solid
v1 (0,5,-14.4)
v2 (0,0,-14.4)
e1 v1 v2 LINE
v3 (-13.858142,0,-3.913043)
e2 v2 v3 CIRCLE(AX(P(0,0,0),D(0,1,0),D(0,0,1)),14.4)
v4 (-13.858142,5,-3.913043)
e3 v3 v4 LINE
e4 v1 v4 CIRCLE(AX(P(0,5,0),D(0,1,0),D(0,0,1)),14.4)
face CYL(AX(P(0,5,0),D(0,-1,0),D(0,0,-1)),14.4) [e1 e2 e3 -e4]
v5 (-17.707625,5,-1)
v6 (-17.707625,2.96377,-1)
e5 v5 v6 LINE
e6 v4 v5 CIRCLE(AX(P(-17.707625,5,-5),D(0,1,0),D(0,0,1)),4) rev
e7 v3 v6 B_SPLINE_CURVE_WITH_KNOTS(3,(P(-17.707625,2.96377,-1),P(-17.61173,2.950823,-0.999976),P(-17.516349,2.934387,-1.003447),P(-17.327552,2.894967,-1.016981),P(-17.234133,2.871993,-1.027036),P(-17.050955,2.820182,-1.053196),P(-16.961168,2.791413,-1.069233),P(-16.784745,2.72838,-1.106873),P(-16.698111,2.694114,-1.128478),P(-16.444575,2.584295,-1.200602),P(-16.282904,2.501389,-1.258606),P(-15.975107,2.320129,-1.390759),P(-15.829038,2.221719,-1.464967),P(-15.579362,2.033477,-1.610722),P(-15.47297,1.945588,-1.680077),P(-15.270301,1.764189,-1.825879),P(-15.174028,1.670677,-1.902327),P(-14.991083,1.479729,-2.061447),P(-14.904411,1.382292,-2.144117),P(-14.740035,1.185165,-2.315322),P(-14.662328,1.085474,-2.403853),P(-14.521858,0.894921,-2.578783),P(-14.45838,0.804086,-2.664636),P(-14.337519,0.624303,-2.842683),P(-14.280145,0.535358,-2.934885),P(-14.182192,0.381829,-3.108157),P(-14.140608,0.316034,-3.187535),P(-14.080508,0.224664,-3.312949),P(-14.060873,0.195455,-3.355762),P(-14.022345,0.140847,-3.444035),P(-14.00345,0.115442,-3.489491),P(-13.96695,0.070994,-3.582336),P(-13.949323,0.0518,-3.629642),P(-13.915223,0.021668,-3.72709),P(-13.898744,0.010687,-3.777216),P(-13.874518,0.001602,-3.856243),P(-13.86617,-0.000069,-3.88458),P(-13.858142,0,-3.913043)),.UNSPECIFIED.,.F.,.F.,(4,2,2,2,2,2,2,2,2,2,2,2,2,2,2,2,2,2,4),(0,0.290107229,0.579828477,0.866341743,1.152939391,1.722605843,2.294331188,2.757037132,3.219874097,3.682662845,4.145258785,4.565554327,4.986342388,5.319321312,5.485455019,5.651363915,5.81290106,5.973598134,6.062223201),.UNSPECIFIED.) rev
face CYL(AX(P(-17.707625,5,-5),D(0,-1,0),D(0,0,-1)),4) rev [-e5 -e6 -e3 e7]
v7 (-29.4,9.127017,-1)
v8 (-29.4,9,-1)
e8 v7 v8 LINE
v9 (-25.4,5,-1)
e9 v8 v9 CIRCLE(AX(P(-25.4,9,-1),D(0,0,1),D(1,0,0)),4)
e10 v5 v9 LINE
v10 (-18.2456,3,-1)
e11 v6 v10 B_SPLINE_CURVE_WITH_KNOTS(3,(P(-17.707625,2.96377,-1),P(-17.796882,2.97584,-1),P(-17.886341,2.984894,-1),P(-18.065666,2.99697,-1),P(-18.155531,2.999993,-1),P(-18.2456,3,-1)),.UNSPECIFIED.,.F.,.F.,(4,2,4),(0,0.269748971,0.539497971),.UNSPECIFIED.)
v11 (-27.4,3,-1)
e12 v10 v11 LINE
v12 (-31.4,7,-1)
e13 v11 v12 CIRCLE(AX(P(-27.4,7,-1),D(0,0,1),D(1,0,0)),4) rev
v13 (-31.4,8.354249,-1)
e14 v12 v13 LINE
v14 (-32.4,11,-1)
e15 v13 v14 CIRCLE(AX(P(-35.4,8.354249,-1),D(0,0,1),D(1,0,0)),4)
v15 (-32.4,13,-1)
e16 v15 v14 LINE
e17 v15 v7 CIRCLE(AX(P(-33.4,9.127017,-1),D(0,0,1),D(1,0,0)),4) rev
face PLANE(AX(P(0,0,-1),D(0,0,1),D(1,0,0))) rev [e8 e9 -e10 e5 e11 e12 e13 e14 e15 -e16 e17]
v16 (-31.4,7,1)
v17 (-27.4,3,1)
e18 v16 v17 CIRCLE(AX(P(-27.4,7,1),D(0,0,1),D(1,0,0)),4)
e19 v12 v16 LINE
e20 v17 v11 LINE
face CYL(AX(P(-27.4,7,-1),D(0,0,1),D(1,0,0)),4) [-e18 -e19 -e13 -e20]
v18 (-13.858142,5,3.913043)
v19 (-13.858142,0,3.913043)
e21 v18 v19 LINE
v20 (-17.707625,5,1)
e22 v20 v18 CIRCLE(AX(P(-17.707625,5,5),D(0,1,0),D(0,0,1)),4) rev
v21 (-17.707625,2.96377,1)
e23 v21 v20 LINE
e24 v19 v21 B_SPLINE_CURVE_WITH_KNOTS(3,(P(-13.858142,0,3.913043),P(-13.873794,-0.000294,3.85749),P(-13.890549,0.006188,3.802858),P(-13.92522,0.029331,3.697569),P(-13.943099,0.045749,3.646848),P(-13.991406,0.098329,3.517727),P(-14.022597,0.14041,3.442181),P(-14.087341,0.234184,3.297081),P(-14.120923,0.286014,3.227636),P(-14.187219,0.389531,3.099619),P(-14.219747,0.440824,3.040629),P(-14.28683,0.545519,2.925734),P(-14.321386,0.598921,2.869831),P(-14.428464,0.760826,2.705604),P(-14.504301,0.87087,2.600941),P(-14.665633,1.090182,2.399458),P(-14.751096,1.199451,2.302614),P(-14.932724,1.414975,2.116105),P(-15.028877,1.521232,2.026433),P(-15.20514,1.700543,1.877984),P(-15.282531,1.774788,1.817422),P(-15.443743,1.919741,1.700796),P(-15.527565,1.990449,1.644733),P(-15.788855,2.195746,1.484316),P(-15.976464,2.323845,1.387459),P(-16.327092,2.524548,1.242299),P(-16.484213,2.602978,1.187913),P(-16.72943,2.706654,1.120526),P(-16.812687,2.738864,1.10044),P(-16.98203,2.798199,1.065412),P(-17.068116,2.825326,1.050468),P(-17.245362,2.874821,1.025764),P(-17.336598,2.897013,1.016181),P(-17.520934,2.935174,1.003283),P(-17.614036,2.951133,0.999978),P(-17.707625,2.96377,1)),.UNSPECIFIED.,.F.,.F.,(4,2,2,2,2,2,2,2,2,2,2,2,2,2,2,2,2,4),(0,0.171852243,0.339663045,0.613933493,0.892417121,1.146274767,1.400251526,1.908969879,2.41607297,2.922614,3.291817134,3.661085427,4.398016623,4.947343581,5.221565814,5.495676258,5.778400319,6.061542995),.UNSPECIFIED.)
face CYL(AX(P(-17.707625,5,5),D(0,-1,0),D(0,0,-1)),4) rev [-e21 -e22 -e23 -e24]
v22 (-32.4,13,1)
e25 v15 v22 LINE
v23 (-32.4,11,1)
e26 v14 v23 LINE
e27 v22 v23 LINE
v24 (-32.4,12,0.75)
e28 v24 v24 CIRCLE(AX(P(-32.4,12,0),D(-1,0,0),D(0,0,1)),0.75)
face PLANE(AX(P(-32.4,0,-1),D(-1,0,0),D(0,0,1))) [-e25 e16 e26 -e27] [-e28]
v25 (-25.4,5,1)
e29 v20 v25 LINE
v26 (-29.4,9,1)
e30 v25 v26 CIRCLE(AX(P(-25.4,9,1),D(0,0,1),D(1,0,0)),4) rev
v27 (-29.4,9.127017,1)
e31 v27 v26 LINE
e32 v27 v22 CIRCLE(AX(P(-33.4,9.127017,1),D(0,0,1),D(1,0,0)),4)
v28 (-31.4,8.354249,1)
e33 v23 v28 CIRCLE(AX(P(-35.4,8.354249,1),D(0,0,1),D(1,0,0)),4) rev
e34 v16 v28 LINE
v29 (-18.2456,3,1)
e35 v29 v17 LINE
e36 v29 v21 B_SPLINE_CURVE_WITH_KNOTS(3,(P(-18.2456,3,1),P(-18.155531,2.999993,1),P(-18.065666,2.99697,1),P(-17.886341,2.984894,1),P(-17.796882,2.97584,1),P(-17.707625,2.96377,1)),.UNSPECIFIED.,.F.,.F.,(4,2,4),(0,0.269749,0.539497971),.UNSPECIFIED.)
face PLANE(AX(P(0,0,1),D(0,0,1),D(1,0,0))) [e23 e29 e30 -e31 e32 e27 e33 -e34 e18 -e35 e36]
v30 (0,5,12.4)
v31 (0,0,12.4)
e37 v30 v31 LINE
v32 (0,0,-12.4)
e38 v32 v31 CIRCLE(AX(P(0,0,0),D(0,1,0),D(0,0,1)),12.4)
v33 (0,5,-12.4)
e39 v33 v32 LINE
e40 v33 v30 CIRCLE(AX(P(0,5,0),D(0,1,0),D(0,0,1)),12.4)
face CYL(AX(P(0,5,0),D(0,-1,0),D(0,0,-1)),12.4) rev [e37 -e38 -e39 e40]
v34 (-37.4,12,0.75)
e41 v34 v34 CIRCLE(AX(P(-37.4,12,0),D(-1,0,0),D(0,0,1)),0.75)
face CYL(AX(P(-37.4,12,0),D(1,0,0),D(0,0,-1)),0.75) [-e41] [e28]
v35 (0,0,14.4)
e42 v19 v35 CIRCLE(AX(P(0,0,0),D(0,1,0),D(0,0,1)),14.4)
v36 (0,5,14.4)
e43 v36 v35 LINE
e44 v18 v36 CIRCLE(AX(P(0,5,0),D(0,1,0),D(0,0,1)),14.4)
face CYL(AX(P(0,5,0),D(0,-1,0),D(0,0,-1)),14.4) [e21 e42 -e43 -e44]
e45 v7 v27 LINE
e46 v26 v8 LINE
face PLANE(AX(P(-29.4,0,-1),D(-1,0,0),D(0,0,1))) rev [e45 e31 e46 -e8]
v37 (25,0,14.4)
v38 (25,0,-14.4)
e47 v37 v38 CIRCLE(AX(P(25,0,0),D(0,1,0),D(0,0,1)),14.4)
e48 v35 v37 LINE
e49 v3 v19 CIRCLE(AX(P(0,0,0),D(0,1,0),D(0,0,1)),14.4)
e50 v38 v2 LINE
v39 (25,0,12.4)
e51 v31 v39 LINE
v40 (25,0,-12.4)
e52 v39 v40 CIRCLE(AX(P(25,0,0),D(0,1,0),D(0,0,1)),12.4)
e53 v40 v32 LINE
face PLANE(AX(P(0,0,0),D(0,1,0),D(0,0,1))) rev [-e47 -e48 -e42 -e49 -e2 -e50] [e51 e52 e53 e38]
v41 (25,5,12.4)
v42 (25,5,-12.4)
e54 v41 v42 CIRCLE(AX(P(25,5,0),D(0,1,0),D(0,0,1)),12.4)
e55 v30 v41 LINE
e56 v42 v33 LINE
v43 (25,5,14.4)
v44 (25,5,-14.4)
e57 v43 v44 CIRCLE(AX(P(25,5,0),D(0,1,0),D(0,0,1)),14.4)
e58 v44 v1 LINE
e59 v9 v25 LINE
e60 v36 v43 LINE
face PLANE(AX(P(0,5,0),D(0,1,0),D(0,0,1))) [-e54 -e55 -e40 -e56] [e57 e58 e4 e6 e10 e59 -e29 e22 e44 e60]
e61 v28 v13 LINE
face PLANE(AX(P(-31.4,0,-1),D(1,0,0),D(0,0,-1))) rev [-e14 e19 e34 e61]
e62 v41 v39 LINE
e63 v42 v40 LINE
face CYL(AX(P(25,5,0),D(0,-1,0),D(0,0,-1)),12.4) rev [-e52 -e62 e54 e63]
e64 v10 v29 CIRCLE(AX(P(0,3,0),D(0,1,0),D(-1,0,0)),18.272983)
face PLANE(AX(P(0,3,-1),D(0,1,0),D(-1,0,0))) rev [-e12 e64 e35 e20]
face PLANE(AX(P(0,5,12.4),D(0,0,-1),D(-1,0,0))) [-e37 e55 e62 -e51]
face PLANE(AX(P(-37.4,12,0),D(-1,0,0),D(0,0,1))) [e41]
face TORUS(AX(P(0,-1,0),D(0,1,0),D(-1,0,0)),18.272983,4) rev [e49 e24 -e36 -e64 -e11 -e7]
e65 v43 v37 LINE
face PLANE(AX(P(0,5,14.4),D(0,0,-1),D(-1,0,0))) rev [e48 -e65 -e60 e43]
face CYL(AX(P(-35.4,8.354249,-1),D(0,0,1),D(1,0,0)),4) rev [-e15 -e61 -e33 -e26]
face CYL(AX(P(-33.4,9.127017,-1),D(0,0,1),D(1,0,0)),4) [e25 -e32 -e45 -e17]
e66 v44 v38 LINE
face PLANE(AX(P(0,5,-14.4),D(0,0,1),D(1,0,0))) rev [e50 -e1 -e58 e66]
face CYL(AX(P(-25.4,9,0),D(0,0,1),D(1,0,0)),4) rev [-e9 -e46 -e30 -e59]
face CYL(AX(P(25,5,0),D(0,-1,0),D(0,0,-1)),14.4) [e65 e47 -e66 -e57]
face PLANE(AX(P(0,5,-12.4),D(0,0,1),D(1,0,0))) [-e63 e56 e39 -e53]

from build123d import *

# Parameters (mm, degrees)
BOSS_EXTRUDE1_DEPTH      = 5
BOSS_EXTRUDE2_DEPTH      = 1
BOSS_EXTRUDE2_DEPTH_BACK = 1
SKETCH4_W                = 2
SKETCH4_H                = 1
SKETCH4_W_2              = 17
SKETCH4_H_2              = 2
SKETCH5_R                = 0.75
BOSS_EXTRUDE3_DEPTH      = 5
FILLET1_R                = 4


with BuildPart() as part:
    # Sketch1 → Boss-Extrude1 (new body)
    with BuildSketch(Plane(origin=(0, 0, 0), x_dir=(1, 0, 0), z_dir=(0, 1, 0))):
        with BuildLine():
            Line((0, 14.4), (25, 14.4))
            ThreePointArc((25, 14.4), (39.4, 0), (25, -14.4))
            Line((25, -14.4), (0, -14.4))
            ThreePointArc((0, -14.4), (-14.4, 0), (0, 14.4))
        make_face()
        with BuildLine():
            Line((0, 12.4), (25, 12.4))
            ThreePointArc((25, 12.4), (37.4, 0), (25, -12.4))
            Line((25, -12.4), (0, -12.4))
            ThreePointArc((0, -12.4), (-12.4, 0), (0, 12.4))
        make_face(mode=Mode.SUBTRACT)
    extrude(amount=BOSS_EXTRUDE1_DEPTH)

    # Sketch4 → Boss-Extrude2 (add, two sides: drawn at the far end of the back side and taken through both)
    with BuildSketch(Plane.XY.offset(-BOSS_EXTRUDE2_DEPTH_BACK)):
        Polygon((-31.4, 12), (-29.4, 12), (-29.4, 13), (-32.4, 13), (-32.4, 11), (-31.4, 11), align=None)
        with Locations((-30.4, 11.5)):
            Rectangle(SKETCH4_W, SKETCH4_H)
        Polygon((-29.4, 3), (-29.4, 5), (-29.4, 11), (-31.4, 11), (-31.4, 3), align=None)
        with Locations((-20.9, 4)):
            Rectangle(SKETCH4_W_2, SKETCH4_H_2)
    extrude(amount=BOSS_EXTRUDE2_DEPTH + BOSS_EXTRUDE2_DEPTH_BACK)

    # Sketch5 → Boss-Extrude3 (add)
    with BuildSketch(Plane.ZY.offset(32.4)):
        with Locations((0, 12)):
            Circle(SKETCH5_R)
    extrude(amount=BOSS_EXTRUDE3_DEPTH)

    # Fillet1
    # the kernel refuses this fillet: 4 mm, written as the material it adds along each edge
    with BuildSketch(Plane(origin=(-14.365235814, 5, -1), x_dir=(0.17149804582148126, 0, -0.9851844600273663), z_dir=(0, -1, 0))) as fillet1_piece_1:
        with BuildLine():
            CenterArc((3.367524545, -3.978862537), FILLET1_R, 95.892851455, 74.232218513)
            Line((-0.573213295, -3.292870354), (-0.652028052, -3.27915051))
            Line((-0.652028052, -3.27915051), (-0.078814757, 0.013719844))
            Line((-0.078814757, 0.013719844), (0.008213474, 0.079577251))
            ThreePointArc((0.008213474, 0.079577251), (1.47842541, 0.003905135), (2.948637345, 0.079577251))
            Line((2.948637345, 0.079577251), (2.95685082, 0))
        make_face()
    extrude(amount=2)
    with BuildSketch(Plane(origin=(-14.365235814, 5, 1), x_dir=(0.17149804582148112, 0, 0.9851844600273663), z_dir=(0, -1, 0))) as fillet1_piece_2:
        with BuildLine():
            CenterArc((3.367524545, 3.978862537), FILLET1_R, 189.874930032, 74.232218513)
            Line((-0.573213295, 3.292870354), (-0.652028052, 3.27915051))
            Line((-0.652028052, 3.27915051), (-0.078814757, -0.013719844))
            Line((-0.078814757, -0.013719844), (0.008213474, -0.079577251))
            ThreePointArc((0.008213474, -0.079577251), (1.47842541, -0.003905135), (2.948637345, -0.079577251))
            Line((2.948637345, -0.079577251), (2.95685082, 0))
        make_face()
    extrude(amount=2)
    with BuildSketch(Plane(origin=(0, 3, 0), x_dir=(-0.7371891614816782, 0, 0.6756864214959037), z_dir=(0.6756864214959037, 0, 0.7371891614816782))) as fillet1_piece_3_section:
        with BuildLine():
            CenterArc((18.272983346, 4), FILLET1_R, 194.477512186, 75.522487814)
            Line((18.272983346, 0), (18.272983346, -0.08))
            Line((18.272983346, -0.08), (14.4, -0.08))
            Line((14.4, -0.08), (14.32, 0))
            ThreePointArc((14.32, 0), (14.32, 1.5), (14.322540333, 2.98))
            Line((14.322540333, 2.98), (14.4, 3))
        make_face()
    fillet1_piece_3 = revolve(axis=Axis((0, 3, 0), (0, -1, 0)), revolution_arc=85.014954966, mode=Mode.PRIVATE)
    fillet1_piece_3 = split(fillet1_piece_3, bisect_by=Plane(origin=(-15.301586286, 2.241601932, -1), z_dir=(0, 0, 1)), keep=Keep.TOP, mode=Mode.PRIVATE)
    fillet1_piece_3 = split(fillet1_piece_3, bisect_by=Plane(origin=(-15.301586286, 2.241601932, 1), z_dir=(0, 0, -1)), keep=Keep.TOP, mode=Mode.PRIVATE)
    add(fillet1_piece_3)
    with BuildSketch(Plane(origin=(-29.4, 5, 1), x_dir=(1, 0, 0), z_dir=(0, 0, -1))) as fillet1_piece_4:
        with BuildLine():
            CenterArc((FILLET1_R, -FILLET1_R), FILLET1_R, 90, 90)
            Line((0, -FILLET1_R), (-FILLET1_R * 0.02, -FILLET1_R))
            Line((-FILLET1_R * 0.02, -FILLET1_R), (-FILLET1_R * 0.02, FILLET1_R * 0.02))
            Line((-FILLET1_R * 0.02, FILLET1_R * 0.02), (FILLET1_R, FILLET1_R * 0.02))
            Line((FILLET1_R, FILLET1_R * 0.02), (FILLET1_R, 0))
        make_face()
    extrude(amount=2)
    with BuildSketch(Plane(origin=(-31.4, 11, -1), x_dir=(0, -1, 0), z_dir=(0, 0, 1))) as fillet1_piece_5:
        with BuildLine():
            CenterArc((2.645751311, -4), FILLET1_R, 90, 41.409622109)
            Line((0, -1), (-0.052915026, -0.94))
            ThreePointArc((-0.052915026, -0.94), (-0.08, -0.5), (-0.08, 0))
            Line((-0.08, 0), (0, 0.08))
            Line((0, 0.08), (2.645751311, 0.08))
            Line((2.645751311, 0.08), (2.645751311, 0))
        make_face()
    extrude(amount=2)
    with BuildSketch(Plane(origin=(-14.365235814, 5, -1), x_dir=(0.17149804582148126, 0, -0.9851844600273663), z_dir=(0, -1, 0))) as fillet1_piece_6a_section:
        with BuildLine():
            CenterArc((3.367524545, -3.978862537), FILLET1_R, 95.892851455, 74.232218513)
            Line((-0.573213295, -3.292870354), (-0.652028052, -3.27915051))
            Line((-0.652028052, -3.27915051), (-0.078814757, 0.013719844))
            Line((-0.078814757, 0.013719844), (0.008213474, 0.079577251))
            ThreePointArc((0.008213474, 0.079577251), (1.47842541, 0.003905135), (2.948637345, 0.079577251))
            Line((2.948637345, 0.079577251), (2.95685082, 0))
        make_face()
    fillet1_piece_6a = extrude(amount=10.355974154, mode=Mode.PRIVATE)
    fillet1_piece_6a = split(fillet1_piece_6a, bisect_by=Plane(origin=(-15.057221624, 0, -1.646357347), z_dir=(0, 1, 0)), keep=Keep.TOP, mode=Mode.PRIVATE)
    fillet1_piece_6a = split(fillet1_piece_6a, bisect_by=Plane(origin=(-15.057221624, 3, -1.646357347), z_dir=(0, -1, 0)), keep=Keep.TOP, mode=Mode.PRIVATE)
    with BuildSketch(Plane(origin=(0, 3, 0), x_dir=(-0.7371891614816782, 0, 0.6756864214959037), z_dir=(0.6756864214959037, 0, 0.7371891614816782))) as fillet1_piece_6b_section:
        with BuildLine():
            CenterArc((18.272983346, 4), FILLET1_R, 194.477512186, 75.522487814)
            Line((18.272983346, 0), (18.272983346, -0.08))
            Line((18.272983346, -0.08), (14.4, -0.08))
            Line((14.4, -0.08), (14.32, 0))
            ThreePointArc((14.32, 0), (14.32, 1.5), (14.322540333, 2.98))
            Line((14.322540333, 2.98), (14.4, 3))
        make_face()
    fillet1_piece_6b = revolve(axis=Axis((0, 3, 0), (0, -1, 0)), revolution_arc=85.014954966, mode=Mode.PRIVATE)
    fillet1_piece_6b = split(fillet1_piece_6b, bisect_by=Plane(origin=(-13.861423807, 2.266551545, -1), z_dir=(0, 0, -1)), keep=Keep.TOP, mode=Mode.PRIVATE)
    fillet1_piece_6 = fillet1_piece_6a & fillet1_piece_6b
    add(fillet1_piece_6)
    with BuildSketch(Plane(origin=(0, 3, 0), x_dir=(-0.7371891614816782, 0, 0.6756864214959037), z_dir=(0.6756864214959037, 0, 0.7371891614816782))) as fillet1_piece_7a_section:
        with BuildLine():
            CenterArc((18.272983346, 4), FILLET1_R, 194.477512186, 75.522487814)
            Line((18.272983346, 0), (18.272983346, -0.08))
            Line((18.272983346, -0.08), (14.4, -0.08))
            Line((14.4, -0.08), (14.32, 0))
            ThreePointArc((14.32, 0), (14.32, 1.5), (14.322540333, 2.98))
            Line((14.322540333, 2.98), (14.4, 3))
        make_face()
    fillet1_piece_7a = revolve(axis=Axis((0, 3, 0), (0, -1, 0)), revolution_arc=85.014954966, mode=Mode.PRIVATE)
    fillet1_piece_7a = split(fillet1_piece_7a, bisect_by=Plane(origin=(-13.861424305, 2.266551683, 1), z_dir=(0, 0, 1)), keep=Keep.TOP, mode=Mode.PRIVATE)
    with BuildSketch(Plane(origin=(-14.365235814, 5, 1), x_dir=(0.17149804582148112, 0, 0.9851844600273663), z_dir=(0, -1, 0))) as fillet1_piece_7b_section:
        with BuildLine():
            CenterArc((3.367524545, 3.978862537), FILLET1_R, 189.874930032, 74.232218513)
            Line((-0.573213295, 3.292870354), (-0.652028052, 3.27915051))
            Line((-0.652028052, 3.27915051), (-0.078814757, -0.013719844))
            Line((-0.078814757, -0.013719844), (0.008213474, -0.079577251))
            ThreePointArc((0.008213474, -0.079577251), (1.47842541, -0.003905135), (2.948637345, -0.079577251))
            Line((2.948637345, -0.079577251), (2.95685082, 0))
        make_face()
    fillet1_piece_7b = extrude(amount=10.355974154, mode=Mode.PRIVATE)
    fillet1_piece_7b = split(fillet1_piece_7b, bisect_by=Plane(origin=(-15.057221624, 0, 1.646357347), z_dir=(0, 1, 0)), keep=Keep.TOP, mode=Mode.PRIVATE)
    fillet1_piece_7b = split(fillet1_piece_7b, bisect_by=Plane(origin=(-15.057221624, 3, 1.646357347), z_dir=(0, -1, 0)), keep=Keep.TOP, mode=Mode.PRIVATE)
    fillet1_piece_7 = fillet1_piece_7a & fillet1_piece_7b
    add(fillet1_piece_7)
    # the kernel refuses this fillet: 4 mm, written as the material it takes off along each edge
    with BuildSketch(Plane(origin=(-31.4, 3, -11), x_dir=(1, 0, 0), z_dir=(0, 0, 1))) as fillet1_2_piece_1:
        with BuildLine():
            CenterArc((FILLET1_R, FILLET1_R), FILLET1_R, 180, 90)
            Line((0, FILLET1_R), (-FILLET1_R * 0.02, FILLET1_R))
            Line((-FILLET1_R * 0.02, FILLET1_R), (-FILLET1_R * 0.02, -FILLET1_R * 0.02))
            Line((-FILLET1_R * 0.02, -FILLET1_R * 0.02), (FILLET1_R, -FILLET1_R * 0.02))
            Line((FILLET1_R, -FILLET1_R * 0.02), (FILLET1_R, 0))
        make_face()
    extrude(amount=22, mode=Mode.SUBTRACT)
    with BuildSketch(Plane(origin=(-29.4, 13, -10.682458366), x_dir=(-1, 0, 0), z_dir=(0, 0, 1))) as fillet1_2_piece_2:
        with BuildLine():
            CenterArc((4, 3.872983346), FILLET1_R, 180, 75.522487814)
            Line((0, 3.872983346), (-0.08, 3.872983346))
            Line((-0.08, 3.872983346), (-0.08, 0))
            Line((-0.08, 0), (0, -0.08))
            ThreePointArc((0, -0.08), (1.5, -0.08), (2.98, -0.077459667))
            Line((2.98, -0.077459667), (3, 0))
        make_face()
    extrude(amount=21.364916731, mode=Mode.SUBTRACT)


solid = part.part
